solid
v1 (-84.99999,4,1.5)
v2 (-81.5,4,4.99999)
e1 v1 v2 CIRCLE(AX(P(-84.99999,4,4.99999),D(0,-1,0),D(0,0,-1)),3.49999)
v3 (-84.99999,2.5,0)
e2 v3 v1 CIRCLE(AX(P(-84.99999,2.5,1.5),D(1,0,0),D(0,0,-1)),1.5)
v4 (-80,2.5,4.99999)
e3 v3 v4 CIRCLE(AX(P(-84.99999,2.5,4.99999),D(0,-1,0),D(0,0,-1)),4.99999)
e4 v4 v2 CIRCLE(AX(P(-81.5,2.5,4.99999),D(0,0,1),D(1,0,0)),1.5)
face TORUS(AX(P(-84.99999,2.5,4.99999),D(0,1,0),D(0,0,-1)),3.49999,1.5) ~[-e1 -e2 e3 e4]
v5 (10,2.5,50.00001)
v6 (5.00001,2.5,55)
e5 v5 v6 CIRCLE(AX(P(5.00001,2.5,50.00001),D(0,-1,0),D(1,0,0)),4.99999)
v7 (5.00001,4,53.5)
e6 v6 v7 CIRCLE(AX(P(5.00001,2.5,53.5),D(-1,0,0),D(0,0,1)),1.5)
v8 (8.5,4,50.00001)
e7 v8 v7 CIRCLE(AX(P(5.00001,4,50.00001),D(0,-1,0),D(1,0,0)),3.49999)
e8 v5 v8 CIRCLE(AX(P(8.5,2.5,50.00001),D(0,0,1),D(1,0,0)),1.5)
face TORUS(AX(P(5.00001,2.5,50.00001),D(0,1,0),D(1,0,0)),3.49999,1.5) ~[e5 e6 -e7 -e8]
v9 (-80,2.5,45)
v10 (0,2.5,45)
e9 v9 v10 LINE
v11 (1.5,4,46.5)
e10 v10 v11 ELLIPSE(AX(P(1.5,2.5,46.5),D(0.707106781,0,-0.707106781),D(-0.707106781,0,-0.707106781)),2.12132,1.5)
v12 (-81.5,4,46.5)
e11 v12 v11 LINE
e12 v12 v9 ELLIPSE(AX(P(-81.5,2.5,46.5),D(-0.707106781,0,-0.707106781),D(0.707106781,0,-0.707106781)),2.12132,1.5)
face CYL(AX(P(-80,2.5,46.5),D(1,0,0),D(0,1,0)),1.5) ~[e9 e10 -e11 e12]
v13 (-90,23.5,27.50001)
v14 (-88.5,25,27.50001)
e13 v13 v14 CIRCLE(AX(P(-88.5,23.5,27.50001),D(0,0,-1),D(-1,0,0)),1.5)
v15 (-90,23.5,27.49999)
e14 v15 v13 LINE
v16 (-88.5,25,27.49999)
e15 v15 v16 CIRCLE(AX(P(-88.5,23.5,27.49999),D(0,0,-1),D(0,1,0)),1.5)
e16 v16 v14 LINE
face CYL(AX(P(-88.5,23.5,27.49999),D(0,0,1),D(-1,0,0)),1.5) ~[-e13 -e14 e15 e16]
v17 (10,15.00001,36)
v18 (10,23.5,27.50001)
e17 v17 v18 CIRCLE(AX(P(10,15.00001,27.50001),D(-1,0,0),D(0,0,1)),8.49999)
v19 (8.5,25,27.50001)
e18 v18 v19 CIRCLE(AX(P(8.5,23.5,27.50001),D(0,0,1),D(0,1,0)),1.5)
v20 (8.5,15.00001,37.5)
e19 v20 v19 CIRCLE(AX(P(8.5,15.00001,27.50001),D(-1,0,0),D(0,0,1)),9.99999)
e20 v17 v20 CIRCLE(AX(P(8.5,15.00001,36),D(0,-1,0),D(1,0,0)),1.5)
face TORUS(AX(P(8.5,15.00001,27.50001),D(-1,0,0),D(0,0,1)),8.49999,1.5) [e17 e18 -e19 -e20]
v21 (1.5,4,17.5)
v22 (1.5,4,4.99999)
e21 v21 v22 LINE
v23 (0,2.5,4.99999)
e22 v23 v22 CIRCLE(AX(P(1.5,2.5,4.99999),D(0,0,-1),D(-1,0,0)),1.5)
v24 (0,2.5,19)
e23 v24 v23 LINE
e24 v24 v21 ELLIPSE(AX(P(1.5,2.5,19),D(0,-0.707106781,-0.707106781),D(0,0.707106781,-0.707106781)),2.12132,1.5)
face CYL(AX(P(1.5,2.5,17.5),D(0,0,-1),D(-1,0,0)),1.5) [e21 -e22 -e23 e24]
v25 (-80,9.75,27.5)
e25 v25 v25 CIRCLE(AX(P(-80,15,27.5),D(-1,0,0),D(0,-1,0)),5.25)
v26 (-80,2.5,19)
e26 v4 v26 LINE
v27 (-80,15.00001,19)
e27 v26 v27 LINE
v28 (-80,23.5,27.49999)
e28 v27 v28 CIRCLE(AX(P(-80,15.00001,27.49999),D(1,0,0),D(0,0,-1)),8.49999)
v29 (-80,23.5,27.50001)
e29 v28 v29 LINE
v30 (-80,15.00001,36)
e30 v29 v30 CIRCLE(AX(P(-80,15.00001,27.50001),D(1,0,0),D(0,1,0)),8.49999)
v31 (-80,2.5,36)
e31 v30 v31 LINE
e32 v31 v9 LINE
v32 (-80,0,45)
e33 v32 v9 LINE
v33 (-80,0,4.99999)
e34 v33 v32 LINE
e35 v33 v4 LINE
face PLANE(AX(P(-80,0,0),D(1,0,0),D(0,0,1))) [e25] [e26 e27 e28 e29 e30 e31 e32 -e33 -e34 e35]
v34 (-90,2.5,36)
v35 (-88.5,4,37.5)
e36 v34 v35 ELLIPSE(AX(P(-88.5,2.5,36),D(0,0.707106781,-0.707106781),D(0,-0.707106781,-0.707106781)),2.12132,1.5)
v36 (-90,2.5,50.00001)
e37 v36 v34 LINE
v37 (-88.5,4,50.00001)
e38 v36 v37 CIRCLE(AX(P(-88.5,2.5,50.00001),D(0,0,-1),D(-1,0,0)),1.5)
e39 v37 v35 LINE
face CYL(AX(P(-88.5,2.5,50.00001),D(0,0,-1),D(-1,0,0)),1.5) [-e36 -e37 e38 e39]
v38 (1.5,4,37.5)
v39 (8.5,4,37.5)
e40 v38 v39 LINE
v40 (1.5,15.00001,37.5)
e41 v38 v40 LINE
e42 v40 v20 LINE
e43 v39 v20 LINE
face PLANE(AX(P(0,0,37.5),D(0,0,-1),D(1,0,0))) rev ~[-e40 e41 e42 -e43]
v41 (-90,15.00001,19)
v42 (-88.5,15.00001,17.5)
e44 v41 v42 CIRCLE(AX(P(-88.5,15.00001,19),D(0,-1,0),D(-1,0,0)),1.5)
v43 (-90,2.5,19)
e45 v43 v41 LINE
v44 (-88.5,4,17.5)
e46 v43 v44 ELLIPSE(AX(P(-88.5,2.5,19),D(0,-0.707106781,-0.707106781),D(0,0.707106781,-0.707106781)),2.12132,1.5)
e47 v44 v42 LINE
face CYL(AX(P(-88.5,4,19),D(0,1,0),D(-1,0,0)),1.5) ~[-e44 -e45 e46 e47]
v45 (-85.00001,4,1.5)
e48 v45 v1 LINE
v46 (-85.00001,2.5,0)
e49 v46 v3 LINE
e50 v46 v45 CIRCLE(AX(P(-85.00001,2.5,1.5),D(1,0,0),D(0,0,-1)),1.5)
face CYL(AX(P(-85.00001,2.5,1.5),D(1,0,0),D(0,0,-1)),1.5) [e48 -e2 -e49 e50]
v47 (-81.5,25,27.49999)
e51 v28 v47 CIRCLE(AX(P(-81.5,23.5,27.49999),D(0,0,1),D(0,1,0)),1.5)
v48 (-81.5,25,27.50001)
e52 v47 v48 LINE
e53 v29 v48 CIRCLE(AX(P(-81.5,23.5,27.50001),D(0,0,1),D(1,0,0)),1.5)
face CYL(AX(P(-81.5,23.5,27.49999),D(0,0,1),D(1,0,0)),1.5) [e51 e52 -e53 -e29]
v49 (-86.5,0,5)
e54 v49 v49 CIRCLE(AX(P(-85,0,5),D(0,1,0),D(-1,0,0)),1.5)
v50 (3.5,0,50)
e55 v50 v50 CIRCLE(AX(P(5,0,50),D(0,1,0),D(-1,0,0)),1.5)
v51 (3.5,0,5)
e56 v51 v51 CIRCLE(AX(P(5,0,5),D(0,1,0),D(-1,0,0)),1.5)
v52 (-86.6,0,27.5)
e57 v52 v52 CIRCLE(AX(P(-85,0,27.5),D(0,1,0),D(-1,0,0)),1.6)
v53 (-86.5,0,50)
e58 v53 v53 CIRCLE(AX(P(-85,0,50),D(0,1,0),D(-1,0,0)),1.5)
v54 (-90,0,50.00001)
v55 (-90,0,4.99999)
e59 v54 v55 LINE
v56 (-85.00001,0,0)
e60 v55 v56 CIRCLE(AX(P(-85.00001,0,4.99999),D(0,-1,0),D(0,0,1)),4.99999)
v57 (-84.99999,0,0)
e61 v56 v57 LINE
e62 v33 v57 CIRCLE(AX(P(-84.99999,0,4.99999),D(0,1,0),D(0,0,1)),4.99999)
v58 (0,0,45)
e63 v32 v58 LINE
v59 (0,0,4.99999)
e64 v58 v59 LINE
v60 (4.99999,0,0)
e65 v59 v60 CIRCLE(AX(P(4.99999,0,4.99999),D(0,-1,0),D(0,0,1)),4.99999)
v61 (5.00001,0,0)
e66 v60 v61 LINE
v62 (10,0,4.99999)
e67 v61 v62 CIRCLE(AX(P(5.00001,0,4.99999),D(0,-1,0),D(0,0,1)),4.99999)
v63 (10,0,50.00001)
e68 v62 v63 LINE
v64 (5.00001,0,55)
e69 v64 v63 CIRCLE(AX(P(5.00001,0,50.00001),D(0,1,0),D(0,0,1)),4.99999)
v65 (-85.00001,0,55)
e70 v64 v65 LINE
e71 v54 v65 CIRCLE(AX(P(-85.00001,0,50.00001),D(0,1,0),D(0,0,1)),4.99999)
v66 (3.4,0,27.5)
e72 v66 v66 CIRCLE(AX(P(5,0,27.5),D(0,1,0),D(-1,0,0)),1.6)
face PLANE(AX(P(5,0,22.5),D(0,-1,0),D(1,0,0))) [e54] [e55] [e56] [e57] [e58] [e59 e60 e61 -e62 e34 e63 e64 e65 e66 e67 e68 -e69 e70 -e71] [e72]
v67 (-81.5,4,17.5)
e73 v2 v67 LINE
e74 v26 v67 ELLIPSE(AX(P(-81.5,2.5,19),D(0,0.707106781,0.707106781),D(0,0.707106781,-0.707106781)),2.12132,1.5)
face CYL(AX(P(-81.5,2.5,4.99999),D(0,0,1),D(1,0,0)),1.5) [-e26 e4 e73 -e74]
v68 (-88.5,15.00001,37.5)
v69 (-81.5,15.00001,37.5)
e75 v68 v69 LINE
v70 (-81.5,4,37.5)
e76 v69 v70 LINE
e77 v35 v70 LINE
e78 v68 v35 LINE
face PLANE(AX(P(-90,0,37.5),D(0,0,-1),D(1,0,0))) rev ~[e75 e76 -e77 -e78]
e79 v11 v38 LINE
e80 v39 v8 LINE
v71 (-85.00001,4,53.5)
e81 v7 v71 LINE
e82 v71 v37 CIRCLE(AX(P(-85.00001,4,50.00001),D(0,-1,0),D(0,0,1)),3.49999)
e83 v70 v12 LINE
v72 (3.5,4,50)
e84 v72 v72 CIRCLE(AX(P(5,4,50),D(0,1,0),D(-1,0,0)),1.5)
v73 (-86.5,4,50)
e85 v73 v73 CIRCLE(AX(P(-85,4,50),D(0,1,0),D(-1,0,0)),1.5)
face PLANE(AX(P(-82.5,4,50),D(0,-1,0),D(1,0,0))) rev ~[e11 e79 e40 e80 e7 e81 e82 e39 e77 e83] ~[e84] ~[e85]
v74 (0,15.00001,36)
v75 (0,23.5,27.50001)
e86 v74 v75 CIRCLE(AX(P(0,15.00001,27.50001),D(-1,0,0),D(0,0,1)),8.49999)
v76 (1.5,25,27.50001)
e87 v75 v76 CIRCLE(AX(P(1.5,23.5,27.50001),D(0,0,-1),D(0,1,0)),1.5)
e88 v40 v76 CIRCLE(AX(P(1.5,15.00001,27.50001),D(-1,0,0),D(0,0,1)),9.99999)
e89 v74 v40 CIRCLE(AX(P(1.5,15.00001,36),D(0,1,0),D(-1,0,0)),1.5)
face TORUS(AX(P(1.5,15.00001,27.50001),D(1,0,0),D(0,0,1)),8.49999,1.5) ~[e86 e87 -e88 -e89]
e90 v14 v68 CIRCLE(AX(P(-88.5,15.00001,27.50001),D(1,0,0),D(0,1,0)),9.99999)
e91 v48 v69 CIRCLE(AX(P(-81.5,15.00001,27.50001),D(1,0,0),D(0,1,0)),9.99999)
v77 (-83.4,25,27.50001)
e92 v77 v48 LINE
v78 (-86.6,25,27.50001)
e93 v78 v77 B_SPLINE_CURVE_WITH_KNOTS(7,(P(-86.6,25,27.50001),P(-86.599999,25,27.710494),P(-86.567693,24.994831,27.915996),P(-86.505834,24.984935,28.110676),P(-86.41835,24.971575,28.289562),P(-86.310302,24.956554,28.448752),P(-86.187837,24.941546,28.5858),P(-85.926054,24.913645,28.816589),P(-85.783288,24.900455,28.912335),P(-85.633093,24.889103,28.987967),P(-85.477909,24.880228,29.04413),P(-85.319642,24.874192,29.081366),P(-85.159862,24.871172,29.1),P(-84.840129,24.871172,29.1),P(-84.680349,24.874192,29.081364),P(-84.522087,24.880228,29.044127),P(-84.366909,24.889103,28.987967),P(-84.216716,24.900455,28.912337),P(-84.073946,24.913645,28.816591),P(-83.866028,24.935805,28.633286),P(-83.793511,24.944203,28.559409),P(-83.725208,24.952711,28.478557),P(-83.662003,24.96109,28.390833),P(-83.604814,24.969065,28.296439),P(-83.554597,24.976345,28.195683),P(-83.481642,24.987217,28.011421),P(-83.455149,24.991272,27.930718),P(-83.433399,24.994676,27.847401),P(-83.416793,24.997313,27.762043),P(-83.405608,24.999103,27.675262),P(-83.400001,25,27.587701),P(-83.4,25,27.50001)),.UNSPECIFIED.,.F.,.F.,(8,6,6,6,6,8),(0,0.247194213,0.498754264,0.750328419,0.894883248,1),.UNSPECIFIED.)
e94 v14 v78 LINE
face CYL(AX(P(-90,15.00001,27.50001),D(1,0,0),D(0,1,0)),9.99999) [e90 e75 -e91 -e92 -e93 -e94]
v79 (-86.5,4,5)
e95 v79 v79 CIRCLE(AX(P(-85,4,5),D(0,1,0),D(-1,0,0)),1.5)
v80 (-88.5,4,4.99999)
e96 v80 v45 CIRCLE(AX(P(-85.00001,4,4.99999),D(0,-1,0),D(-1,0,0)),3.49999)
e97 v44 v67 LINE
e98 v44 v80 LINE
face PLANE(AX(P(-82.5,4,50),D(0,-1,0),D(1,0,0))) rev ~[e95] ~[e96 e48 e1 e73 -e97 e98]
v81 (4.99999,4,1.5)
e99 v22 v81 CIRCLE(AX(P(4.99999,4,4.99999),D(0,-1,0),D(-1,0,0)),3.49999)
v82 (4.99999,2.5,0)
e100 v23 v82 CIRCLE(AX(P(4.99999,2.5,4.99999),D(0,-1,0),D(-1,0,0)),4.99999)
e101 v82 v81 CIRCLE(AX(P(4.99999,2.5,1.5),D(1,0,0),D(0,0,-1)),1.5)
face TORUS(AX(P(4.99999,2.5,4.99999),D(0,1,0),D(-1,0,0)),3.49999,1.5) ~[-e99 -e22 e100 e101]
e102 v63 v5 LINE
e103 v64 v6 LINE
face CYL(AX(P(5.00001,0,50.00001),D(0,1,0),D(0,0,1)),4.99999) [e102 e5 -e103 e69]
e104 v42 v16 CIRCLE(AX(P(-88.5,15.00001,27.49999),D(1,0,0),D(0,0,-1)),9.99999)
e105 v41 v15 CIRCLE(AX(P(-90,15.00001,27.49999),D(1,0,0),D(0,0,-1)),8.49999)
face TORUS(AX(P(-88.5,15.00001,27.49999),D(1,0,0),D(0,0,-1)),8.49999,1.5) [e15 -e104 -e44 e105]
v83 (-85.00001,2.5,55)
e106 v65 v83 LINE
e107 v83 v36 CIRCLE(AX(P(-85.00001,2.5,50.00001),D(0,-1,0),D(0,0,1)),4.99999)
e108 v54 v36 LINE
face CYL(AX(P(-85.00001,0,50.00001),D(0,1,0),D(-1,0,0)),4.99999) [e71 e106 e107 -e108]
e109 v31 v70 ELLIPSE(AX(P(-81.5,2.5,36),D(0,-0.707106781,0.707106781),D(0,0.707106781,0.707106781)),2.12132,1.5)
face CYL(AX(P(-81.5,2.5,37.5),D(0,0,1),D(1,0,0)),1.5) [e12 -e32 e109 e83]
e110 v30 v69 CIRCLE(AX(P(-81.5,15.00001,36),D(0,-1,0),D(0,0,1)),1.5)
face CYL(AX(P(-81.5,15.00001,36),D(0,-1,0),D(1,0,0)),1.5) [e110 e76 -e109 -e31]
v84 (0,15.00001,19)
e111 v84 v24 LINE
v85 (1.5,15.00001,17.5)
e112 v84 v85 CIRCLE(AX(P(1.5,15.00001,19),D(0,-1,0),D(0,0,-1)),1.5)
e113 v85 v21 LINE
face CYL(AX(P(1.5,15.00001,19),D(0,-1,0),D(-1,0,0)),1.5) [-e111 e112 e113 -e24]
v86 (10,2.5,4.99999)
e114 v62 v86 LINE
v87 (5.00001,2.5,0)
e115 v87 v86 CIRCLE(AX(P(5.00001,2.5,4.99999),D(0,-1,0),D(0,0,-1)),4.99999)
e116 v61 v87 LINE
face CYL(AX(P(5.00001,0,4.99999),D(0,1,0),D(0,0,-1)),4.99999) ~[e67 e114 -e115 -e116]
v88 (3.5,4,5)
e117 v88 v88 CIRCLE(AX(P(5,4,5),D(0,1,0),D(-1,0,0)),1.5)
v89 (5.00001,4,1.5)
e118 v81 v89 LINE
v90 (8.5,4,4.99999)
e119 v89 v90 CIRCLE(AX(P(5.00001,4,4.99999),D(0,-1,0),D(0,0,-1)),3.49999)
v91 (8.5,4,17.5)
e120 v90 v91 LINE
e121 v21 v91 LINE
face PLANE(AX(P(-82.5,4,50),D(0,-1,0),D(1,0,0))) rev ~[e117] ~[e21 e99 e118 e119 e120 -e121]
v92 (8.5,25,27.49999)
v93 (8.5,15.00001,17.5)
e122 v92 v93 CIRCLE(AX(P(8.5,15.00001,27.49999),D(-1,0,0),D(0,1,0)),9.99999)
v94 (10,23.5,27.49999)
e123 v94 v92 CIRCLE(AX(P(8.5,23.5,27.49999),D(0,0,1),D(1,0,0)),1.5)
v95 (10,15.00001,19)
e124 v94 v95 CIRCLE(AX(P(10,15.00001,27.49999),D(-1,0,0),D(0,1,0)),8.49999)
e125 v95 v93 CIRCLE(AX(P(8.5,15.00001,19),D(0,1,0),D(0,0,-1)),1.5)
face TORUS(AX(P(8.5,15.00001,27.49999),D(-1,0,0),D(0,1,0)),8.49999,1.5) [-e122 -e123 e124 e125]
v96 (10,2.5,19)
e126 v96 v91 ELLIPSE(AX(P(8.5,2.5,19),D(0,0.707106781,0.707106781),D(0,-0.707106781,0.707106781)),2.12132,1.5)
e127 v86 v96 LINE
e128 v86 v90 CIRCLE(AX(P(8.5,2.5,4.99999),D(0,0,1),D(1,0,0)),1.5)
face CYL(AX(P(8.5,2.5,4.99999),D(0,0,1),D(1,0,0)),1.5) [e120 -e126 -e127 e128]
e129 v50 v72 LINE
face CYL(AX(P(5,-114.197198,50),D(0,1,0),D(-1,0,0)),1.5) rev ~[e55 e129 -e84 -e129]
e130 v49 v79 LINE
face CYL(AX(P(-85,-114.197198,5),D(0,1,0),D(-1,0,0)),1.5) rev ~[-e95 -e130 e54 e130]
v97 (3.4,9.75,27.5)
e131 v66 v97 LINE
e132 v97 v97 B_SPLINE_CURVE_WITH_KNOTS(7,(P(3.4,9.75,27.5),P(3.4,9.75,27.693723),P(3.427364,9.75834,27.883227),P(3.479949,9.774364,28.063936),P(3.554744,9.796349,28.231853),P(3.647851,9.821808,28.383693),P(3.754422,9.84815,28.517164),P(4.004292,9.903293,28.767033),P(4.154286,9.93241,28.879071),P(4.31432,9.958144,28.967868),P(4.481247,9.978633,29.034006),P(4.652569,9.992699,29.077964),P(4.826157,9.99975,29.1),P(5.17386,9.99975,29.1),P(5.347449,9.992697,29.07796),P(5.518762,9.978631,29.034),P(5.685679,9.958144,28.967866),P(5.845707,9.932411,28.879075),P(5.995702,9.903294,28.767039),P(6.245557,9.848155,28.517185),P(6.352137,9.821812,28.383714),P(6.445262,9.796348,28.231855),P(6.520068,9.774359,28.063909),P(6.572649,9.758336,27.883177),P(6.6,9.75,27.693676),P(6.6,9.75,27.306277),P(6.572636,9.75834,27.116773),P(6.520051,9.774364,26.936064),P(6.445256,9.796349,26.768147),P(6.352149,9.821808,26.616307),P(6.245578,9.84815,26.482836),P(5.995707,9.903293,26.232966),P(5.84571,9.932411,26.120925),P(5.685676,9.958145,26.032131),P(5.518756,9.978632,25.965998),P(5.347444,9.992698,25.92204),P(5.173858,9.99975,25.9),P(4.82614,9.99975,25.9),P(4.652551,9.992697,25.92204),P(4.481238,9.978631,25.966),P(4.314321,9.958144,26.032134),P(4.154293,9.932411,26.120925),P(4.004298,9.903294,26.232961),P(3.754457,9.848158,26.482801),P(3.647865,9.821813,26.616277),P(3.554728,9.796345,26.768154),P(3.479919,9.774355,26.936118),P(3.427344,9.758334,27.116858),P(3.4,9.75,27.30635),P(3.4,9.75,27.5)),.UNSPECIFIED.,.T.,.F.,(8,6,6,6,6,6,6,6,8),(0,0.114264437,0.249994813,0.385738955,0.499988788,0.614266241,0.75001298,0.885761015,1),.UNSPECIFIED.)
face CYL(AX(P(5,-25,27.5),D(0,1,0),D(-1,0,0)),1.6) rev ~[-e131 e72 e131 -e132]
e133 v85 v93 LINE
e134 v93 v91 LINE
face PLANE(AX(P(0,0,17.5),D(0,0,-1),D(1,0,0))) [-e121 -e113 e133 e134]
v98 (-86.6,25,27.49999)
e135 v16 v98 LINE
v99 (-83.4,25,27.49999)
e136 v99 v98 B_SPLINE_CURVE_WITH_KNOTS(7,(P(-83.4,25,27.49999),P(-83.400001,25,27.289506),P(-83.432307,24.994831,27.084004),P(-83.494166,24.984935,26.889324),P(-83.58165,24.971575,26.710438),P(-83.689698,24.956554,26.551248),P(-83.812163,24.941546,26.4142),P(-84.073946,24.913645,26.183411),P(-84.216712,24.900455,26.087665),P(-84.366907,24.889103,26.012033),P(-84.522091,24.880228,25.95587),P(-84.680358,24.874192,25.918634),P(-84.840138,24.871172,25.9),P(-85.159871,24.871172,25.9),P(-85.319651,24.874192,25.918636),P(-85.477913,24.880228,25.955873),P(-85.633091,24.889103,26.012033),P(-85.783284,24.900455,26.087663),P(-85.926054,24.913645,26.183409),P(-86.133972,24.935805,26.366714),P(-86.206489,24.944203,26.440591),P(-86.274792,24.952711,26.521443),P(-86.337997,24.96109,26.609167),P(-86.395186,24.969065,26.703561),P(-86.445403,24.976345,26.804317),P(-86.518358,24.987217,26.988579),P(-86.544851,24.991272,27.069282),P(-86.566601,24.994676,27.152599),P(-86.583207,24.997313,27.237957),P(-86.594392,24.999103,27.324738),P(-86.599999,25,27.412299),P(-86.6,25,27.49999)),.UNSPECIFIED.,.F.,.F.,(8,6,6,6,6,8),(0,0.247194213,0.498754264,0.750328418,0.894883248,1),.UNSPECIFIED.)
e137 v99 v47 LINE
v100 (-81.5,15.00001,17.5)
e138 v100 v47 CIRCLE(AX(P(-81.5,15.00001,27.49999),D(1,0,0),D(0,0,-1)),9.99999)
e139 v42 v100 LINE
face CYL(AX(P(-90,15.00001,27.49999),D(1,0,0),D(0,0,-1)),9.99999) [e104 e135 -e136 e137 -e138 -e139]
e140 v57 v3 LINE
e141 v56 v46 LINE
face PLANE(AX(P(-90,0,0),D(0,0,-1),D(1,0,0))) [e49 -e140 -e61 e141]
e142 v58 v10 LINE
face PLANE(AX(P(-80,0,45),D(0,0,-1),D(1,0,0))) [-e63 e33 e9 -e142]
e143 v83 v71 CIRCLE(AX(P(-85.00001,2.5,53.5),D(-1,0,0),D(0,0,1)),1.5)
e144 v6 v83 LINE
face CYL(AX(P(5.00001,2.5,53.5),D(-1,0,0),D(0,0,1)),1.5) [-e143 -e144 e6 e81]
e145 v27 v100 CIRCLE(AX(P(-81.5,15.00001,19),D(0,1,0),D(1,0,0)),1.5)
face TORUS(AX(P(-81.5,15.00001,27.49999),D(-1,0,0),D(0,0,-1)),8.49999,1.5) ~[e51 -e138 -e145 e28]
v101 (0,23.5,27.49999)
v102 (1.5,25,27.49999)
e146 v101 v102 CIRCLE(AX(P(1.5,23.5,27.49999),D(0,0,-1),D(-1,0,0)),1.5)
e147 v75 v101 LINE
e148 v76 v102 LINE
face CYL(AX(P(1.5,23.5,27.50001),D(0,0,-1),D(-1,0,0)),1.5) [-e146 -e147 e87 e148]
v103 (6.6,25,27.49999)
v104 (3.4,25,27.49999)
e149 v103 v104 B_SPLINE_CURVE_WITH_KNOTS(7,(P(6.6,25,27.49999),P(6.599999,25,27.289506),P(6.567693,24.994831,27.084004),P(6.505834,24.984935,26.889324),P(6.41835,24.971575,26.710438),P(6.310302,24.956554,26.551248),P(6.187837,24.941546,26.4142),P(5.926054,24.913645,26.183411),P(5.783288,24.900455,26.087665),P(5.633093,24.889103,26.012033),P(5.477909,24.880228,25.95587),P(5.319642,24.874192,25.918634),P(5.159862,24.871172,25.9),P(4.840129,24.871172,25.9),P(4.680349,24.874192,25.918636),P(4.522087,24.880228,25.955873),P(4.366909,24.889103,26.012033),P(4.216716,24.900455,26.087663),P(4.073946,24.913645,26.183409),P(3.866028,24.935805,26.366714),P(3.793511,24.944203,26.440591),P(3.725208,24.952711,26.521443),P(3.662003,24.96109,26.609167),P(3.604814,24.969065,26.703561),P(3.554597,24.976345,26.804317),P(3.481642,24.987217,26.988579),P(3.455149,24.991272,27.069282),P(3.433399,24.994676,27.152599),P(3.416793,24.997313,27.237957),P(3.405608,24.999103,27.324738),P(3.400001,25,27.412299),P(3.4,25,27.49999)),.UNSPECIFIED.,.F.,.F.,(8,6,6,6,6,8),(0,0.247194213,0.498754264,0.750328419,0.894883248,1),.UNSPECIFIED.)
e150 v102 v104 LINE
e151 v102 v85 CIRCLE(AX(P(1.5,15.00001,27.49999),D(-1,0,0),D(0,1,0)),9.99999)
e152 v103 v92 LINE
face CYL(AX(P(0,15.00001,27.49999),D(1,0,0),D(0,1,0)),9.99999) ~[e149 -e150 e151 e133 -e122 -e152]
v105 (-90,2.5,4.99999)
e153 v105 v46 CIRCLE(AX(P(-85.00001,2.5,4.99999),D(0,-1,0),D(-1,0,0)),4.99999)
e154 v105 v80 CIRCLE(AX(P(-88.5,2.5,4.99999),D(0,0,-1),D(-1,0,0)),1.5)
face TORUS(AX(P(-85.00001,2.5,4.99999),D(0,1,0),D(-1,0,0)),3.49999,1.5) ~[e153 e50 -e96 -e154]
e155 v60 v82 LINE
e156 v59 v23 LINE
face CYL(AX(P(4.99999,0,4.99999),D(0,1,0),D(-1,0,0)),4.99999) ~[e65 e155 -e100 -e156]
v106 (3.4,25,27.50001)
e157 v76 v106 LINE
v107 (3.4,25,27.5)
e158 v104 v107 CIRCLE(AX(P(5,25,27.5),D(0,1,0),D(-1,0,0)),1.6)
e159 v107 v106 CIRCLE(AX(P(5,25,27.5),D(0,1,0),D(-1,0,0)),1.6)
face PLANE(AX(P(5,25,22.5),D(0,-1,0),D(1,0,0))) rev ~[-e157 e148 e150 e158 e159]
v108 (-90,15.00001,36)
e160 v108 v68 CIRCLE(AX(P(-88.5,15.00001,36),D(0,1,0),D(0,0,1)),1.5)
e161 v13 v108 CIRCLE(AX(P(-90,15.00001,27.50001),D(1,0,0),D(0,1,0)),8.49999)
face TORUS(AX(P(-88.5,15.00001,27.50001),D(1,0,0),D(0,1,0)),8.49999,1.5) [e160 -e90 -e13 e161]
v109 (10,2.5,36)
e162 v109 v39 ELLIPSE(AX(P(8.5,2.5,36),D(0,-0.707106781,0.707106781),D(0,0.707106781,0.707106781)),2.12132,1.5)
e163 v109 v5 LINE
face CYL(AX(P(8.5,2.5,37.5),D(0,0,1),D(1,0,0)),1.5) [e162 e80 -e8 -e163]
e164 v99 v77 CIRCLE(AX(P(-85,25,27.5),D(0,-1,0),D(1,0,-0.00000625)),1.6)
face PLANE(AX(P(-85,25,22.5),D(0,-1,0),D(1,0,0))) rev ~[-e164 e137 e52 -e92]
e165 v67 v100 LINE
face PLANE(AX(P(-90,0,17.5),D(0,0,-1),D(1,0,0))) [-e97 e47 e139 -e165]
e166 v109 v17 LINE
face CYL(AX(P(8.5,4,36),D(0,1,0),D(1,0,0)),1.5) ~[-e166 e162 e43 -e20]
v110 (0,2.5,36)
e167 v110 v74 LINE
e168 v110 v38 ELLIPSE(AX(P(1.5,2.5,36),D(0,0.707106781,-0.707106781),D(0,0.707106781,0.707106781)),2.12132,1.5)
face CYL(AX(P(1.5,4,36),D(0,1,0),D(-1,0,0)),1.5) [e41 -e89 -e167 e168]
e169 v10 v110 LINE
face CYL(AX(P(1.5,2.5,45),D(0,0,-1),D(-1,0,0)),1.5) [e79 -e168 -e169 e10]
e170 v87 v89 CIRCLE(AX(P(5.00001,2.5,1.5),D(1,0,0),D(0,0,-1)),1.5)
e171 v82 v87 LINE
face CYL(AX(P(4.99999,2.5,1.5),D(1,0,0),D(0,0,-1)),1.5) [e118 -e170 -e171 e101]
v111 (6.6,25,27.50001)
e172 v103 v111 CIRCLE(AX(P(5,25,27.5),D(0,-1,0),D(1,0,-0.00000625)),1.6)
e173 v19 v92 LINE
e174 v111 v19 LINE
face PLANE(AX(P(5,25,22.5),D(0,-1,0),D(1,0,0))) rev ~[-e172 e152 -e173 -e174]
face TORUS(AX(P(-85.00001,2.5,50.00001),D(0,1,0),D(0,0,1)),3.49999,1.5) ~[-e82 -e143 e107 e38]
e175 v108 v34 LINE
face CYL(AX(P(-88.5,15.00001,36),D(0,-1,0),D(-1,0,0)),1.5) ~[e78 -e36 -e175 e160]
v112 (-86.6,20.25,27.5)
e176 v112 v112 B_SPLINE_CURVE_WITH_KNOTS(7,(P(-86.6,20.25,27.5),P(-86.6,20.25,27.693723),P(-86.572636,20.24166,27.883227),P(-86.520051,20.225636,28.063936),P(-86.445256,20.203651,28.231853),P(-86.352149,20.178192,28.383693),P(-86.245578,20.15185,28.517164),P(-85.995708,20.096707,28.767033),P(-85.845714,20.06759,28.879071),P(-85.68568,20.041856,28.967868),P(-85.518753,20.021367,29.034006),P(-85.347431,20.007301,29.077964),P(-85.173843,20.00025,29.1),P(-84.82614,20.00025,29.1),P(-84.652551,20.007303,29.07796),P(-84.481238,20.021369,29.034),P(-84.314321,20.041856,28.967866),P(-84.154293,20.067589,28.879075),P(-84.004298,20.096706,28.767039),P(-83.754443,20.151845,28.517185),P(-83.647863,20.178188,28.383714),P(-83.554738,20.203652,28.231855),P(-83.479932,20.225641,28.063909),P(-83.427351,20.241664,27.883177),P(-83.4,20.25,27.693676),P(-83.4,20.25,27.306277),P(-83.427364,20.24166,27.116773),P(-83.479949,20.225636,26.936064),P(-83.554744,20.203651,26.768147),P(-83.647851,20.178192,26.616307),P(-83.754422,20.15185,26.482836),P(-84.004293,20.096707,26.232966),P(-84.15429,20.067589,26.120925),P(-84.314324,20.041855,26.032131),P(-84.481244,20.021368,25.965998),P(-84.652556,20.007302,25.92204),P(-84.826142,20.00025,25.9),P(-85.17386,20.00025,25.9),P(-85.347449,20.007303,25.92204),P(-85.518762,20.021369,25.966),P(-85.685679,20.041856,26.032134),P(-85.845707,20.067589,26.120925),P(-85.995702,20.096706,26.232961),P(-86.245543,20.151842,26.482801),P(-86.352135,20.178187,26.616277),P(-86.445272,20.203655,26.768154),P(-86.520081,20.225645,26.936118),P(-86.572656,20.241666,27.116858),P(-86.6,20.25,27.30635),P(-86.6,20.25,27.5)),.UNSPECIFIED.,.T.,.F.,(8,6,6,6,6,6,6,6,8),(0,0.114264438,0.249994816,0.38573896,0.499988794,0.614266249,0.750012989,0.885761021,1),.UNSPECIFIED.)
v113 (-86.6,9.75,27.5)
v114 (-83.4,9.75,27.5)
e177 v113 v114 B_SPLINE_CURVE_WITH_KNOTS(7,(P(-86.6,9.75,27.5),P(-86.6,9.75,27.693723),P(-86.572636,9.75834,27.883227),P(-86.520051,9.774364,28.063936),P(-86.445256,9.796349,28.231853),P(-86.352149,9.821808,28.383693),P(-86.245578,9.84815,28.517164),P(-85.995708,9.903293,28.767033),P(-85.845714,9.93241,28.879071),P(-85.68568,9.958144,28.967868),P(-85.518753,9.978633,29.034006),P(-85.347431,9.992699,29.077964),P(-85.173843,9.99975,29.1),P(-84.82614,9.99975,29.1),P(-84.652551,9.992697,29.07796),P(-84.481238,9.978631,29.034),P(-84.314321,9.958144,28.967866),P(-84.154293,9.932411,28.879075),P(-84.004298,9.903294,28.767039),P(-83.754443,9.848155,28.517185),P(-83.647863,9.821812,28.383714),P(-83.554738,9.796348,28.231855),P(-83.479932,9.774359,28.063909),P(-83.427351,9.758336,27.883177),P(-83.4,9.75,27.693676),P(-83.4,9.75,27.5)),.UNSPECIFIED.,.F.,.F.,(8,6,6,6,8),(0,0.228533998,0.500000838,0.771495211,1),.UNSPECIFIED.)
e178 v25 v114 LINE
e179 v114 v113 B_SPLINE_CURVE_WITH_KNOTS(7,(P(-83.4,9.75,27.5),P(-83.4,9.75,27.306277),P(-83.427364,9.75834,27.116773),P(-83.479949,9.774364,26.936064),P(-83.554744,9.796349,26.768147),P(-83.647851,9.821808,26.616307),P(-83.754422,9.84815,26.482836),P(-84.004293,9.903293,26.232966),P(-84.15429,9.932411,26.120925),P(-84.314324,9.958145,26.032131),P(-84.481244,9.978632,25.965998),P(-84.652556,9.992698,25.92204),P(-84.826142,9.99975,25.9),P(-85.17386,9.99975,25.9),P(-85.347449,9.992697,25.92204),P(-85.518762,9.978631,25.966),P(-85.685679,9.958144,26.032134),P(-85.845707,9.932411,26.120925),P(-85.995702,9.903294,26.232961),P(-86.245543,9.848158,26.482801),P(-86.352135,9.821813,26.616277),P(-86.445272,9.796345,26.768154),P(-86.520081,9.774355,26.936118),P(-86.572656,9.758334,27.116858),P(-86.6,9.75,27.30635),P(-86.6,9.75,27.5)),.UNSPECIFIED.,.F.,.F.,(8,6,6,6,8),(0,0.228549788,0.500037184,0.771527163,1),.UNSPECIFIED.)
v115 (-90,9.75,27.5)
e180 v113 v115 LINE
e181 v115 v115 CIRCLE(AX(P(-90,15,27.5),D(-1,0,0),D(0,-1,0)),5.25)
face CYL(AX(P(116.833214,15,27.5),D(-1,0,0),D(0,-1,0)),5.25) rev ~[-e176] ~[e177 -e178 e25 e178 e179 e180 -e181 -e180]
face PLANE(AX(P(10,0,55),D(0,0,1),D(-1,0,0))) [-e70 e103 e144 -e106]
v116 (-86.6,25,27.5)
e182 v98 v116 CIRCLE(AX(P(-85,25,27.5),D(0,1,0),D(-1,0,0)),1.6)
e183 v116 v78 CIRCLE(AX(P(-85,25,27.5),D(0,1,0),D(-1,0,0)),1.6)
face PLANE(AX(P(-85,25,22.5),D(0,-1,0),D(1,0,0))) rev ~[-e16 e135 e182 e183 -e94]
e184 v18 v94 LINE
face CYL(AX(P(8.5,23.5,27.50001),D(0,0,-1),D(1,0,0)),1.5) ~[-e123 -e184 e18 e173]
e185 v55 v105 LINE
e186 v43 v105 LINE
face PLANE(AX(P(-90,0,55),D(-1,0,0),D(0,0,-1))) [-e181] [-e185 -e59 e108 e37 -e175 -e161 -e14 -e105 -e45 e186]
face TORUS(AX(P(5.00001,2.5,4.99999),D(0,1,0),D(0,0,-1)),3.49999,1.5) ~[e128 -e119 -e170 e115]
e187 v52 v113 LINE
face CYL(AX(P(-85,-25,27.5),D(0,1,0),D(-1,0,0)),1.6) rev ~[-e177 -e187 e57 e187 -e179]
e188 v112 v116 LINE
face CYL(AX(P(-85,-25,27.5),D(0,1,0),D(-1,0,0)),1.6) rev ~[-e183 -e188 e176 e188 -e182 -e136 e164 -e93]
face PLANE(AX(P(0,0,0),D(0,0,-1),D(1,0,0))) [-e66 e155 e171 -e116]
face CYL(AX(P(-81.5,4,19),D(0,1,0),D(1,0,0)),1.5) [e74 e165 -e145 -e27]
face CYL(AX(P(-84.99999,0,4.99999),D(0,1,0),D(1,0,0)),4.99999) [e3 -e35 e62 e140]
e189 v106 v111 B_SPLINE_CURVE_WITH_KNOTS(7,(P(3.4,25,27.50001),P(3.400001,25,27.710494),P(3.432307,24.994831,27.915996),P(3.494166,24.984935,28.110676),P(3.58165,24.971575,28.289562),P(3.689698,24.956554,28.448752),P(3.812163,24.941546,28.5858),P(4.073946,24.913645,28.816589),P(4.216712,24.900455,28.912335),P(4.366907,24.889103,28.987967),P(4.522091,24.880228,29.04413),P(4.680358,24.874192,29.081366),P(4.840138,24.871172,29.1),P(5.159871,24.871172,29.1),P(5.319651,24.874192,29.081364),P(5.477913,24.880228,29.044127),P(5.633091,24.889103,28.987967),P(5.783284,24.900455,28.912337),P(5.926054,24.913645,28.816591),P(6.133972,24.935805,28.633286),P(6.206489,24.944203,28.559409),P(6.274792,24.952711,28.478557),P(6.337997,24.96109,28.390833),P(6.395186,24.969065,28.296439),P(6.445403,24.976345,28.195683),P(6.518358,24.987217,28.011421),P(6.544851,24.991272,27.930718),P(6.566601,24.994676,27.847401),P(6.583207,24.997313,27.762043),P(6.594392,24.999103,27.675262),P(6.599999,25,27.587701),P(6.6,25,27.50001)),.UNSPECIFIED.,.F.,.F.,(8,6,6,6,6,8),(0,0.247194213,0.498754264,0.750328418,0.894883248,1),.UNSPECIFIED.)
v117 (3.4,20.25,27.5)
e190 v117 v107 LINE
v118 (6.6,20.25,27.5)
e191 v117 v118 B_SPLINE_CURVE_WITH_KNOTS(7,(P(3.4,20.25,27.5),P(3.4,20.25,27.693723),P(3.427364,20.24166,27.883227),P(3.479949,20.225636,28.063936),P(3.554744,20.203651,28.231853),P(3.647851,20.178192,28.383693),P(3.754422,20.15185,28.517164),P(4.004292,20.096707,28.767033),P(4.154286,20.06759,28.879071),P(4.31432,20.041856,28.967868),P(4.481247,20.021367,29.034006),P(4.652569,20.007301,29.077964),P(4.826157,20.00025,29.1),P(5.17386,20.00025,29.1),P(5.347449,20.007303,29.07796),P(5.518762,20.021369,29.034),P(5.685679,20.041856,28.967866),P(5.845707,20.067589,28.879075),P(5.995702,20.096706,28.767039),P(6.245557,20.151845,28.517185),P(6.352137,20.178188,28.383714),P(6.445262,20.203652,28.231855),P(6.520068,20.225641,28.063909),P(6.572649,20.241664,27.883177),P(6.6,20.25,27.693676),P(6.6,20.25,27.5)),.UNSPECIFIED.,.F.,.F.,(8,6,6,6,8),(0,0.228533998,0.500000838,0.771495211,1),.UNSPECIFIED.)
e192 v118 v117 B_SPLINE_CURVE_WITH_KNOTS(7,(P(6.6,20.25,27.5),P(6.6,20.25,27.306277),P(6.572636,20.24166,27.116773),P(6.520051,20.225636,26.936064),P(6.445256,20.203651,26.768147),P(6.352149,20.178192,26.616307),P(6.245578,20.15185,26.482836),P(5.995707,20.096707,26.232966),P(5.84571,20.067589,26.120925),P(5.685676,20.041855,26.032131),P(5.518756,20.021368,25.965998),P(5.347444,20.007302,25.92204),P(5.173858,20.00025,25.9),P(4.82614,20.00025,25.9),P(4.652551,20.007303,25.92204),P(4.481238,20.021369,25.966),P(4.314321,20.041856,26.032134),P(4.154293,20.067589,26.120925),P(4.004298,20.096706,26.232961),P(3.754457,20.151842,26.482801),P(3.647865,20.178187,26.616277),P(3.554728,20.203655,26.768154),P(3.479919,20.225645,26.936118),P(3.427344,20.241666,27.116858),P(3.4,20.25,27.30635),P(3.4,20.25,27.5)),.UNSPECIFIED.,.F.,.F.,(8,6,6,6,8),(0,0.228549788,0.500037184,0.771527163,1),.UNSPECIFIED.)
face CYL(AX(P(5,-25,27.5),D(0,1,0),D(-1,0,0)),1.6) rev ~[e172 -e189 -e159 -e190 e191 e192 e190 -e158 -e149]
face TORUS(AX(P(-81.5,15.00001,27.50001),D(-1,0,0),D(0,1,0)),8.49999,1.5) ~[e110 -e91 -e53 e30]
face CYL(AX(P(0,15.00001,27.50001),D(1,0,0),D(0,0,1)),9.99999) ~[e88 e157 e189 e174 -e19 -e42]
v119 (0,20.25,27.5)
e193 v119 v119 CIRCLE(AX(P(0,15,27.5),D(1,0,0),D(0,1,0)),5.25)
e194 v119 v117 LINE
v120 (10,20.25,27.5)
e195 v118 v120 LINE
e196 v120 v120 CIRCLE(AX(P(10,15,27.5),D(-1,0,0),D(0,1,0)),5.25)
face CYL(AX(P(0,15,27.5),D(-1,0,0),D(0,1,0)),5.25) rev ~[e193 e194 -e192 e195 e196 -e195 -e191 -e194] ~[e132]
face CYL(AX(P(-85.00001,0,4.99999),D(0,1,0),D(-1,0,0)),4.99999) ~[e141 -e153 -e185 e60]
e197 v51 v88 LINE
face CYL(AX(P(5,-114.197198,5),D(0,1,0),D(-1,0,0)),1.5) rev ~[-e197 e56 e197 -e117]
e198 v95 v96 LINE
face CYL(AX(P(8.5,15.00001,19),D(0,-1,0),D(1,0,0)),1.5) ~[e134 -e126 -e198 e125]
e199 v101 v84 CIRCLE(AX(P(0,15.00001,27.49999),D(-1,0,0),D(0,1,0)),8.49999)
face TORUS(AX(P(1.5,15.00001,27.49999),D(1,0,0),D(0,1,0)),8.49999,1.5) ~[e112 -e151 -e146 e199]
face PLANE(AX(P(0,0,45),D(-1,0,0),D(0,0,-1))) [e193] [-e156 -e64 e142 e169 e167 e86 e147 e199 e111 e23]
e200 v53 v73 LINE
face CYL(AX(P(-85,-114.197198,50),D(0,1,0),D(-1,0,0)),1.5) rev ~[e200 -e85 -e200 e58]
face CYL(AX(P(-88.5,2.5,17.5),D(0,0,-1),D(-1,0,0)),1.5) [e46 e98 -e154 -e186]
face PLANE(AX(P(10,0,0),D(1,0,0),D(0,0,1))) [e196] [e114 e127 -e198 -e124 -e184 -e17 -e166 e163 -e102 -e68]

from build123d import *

# Parameters (mm, degrees)
F0_W      = 5
F0_H      = 10
F0_H_2    = 5
F0_W_2    = 80
F0_H_3    = 35
F1_DEPTH  = 4
F3_D      = 3
F4_W      = 10
F4_H      = 10
F5_DEPTH  = 25
F7_D      = 10.5
F7_DEPTH  = 10.001
F9_D      = 10.5
F10_R     = 9.99999
F11_R     = 4.99999
F13_D     = 3.2
F13_DEPTH = 25
F13_TIP   = 0.9613769904
F14_R     = 1.5


# Not quite as in the source:
# - a fillet or chamfer is up to 0.001 mm smaller than in the source, because OpenCascade refuses the exact size
# - a feature names something its author has since deleted; it is built from what else it names


with BuildPart() as f1:
    # F0 (on Front) → F1 (new body)
    with BuildSketch(Plane.XZ):
        with Locations((-82.5, 50)):
            Rectangle(F0_W, F0_H)
        with Locations((-87.5, 50)):
            Rectangle(F0_W, F0_H)
        with Locations((-87.5, 5)):
            Rectangle(F0_W, F0_H)
        with Locations((-82.5, 5)):
            Rectangle(F0_W, F0_H)
        with Locations((2.5, 50)):
            Rectangle(F0_W, F0_H)
        with Locations((7.5, 50)):
            Rectangle(F0_W, F0_H)
        with Locations((2.5, 7.5)):
            Rectangle(F0_W, F0_H_2)
        with Locations((7.5, 7.5)):
            Rectangle(F0_W, F0_H_2)
        with Locations((7.5, 2.5)):
            Rectangle(F0_W, F0_H_2)
        with Locations((2.5, 2.5)):
            Rectangle(F0_W, F0_H_2)
        with Locations((-40, 50)):
            Rectangle(F0_W_2, F0_H)
        with Locations((2.5, 27.5)):
            Rectangle(F0_W, F0_H_3)
        with Locations((7.5, 27.5)):
            Rectangle(F0_W, F0_H_3)
        with Locations((-82.5, 27.5)):
            Rectangle(F0_W, F0_H_3)
        with Locations((-87.5, 27.5)):
            Rectangle(F0_W, F0_H_3)
    extrude(amount=-F1_DEPTH)

    # F3 (through all)
    with Locations(Plane.XZ):
        with Locations((5, 50), (-85, 50), (5, 5), (-85, 5)):
            Hole(F3_D / 2)

    # F4 (on Front) → F5 (join)
    with BuildSketch(Plane.XZ):
        with Locations((5, 22.5)):
            Rectangle(F4_W, F4_H)
        with Locations((5, 32.5)):
            Rectangle(F4_W, F4_H)
        with Locations((-85, 22.5)):
            Rectangle(F4_W, F4_H)
        with Locations((-85, 32.5)):
            Rectangle(F4_W, F4_H)
    extrude(amount=-F5_DEPTH)

    # F7 (through all, one way)
    with BuildSketch(Plane(origin=(0, 0, 0), x_dir=(0, 1, 0), z_dir=(-1, 0, 0))):
        with Locations((15, -27.5)):
            Circle(F7_D / 2)
    extrude(amount=-F7_DEPTH, mode=Mode.SUBTRACT)

    # F9 (through all)
    with Locations(Plane.YZ):
        with Locations((15, 27.5)):
            Hole(F9_D / 2)

    # F10 (radius 10 in the source; OpenCascade refuses exactly that, so slightly less here)
    f10_edges = [f1.edges().sort_by_distance(p)[0] for p in [
        (5, 25, 37.5),
        (5, 25, 17.5),
        (-85, 25, 37.5),
        (-85, 25, 17.5),
    ]]
    fillet(f10_edges, radius=F10_R)

    # F11 (radius 5 in the source; OpenCascade refuses exactly that, so slightly less here)
    f11_edges = [f1.edges().sort_by_distance(p)[0] for p in [
        (10, 2, 0),
        (-90, 2, 0),
        (-80, 2, 0),
        (-90, 2, 55),
        (10, 2, 55),
        (0, 2, 0),
    ]]
    fillet(f11_edges, radius=F11_R)

    # F13
    with Locations(Plane.XZ):
        with Locations((5, 27.5), (-85, 27.5)):
            Hole(F13_D / 2, depth=F13_DEPTH)
            with Locations((0, 0, -(F13_DEPTH + F13_TIP / 2))):  # 118° drill point
                Cone(0, F13_D / 2, F13_TIP, mode=Mode.SUBTRACT)

    # F14
    f14_edges = [f1.edges().sort_by_distance(p)[0] for p in [
        (-40, 4, 55),
        (10, 22.071071, 34.571071),
        (10, 4, 11.249995),
        (0, 22.071071, 34.571071),
        (0, 4, 41.25),
        (-40, 4, 45),
        (-80, 4, 41.25),
        (-80, 22.071071, 34.571071),
        (-90, 22.071071, 34.571071),
        (-90, 4, 11.249995),
    ]]
    fillet(f14_edges, radius=F14_R)


solid = f1.part
